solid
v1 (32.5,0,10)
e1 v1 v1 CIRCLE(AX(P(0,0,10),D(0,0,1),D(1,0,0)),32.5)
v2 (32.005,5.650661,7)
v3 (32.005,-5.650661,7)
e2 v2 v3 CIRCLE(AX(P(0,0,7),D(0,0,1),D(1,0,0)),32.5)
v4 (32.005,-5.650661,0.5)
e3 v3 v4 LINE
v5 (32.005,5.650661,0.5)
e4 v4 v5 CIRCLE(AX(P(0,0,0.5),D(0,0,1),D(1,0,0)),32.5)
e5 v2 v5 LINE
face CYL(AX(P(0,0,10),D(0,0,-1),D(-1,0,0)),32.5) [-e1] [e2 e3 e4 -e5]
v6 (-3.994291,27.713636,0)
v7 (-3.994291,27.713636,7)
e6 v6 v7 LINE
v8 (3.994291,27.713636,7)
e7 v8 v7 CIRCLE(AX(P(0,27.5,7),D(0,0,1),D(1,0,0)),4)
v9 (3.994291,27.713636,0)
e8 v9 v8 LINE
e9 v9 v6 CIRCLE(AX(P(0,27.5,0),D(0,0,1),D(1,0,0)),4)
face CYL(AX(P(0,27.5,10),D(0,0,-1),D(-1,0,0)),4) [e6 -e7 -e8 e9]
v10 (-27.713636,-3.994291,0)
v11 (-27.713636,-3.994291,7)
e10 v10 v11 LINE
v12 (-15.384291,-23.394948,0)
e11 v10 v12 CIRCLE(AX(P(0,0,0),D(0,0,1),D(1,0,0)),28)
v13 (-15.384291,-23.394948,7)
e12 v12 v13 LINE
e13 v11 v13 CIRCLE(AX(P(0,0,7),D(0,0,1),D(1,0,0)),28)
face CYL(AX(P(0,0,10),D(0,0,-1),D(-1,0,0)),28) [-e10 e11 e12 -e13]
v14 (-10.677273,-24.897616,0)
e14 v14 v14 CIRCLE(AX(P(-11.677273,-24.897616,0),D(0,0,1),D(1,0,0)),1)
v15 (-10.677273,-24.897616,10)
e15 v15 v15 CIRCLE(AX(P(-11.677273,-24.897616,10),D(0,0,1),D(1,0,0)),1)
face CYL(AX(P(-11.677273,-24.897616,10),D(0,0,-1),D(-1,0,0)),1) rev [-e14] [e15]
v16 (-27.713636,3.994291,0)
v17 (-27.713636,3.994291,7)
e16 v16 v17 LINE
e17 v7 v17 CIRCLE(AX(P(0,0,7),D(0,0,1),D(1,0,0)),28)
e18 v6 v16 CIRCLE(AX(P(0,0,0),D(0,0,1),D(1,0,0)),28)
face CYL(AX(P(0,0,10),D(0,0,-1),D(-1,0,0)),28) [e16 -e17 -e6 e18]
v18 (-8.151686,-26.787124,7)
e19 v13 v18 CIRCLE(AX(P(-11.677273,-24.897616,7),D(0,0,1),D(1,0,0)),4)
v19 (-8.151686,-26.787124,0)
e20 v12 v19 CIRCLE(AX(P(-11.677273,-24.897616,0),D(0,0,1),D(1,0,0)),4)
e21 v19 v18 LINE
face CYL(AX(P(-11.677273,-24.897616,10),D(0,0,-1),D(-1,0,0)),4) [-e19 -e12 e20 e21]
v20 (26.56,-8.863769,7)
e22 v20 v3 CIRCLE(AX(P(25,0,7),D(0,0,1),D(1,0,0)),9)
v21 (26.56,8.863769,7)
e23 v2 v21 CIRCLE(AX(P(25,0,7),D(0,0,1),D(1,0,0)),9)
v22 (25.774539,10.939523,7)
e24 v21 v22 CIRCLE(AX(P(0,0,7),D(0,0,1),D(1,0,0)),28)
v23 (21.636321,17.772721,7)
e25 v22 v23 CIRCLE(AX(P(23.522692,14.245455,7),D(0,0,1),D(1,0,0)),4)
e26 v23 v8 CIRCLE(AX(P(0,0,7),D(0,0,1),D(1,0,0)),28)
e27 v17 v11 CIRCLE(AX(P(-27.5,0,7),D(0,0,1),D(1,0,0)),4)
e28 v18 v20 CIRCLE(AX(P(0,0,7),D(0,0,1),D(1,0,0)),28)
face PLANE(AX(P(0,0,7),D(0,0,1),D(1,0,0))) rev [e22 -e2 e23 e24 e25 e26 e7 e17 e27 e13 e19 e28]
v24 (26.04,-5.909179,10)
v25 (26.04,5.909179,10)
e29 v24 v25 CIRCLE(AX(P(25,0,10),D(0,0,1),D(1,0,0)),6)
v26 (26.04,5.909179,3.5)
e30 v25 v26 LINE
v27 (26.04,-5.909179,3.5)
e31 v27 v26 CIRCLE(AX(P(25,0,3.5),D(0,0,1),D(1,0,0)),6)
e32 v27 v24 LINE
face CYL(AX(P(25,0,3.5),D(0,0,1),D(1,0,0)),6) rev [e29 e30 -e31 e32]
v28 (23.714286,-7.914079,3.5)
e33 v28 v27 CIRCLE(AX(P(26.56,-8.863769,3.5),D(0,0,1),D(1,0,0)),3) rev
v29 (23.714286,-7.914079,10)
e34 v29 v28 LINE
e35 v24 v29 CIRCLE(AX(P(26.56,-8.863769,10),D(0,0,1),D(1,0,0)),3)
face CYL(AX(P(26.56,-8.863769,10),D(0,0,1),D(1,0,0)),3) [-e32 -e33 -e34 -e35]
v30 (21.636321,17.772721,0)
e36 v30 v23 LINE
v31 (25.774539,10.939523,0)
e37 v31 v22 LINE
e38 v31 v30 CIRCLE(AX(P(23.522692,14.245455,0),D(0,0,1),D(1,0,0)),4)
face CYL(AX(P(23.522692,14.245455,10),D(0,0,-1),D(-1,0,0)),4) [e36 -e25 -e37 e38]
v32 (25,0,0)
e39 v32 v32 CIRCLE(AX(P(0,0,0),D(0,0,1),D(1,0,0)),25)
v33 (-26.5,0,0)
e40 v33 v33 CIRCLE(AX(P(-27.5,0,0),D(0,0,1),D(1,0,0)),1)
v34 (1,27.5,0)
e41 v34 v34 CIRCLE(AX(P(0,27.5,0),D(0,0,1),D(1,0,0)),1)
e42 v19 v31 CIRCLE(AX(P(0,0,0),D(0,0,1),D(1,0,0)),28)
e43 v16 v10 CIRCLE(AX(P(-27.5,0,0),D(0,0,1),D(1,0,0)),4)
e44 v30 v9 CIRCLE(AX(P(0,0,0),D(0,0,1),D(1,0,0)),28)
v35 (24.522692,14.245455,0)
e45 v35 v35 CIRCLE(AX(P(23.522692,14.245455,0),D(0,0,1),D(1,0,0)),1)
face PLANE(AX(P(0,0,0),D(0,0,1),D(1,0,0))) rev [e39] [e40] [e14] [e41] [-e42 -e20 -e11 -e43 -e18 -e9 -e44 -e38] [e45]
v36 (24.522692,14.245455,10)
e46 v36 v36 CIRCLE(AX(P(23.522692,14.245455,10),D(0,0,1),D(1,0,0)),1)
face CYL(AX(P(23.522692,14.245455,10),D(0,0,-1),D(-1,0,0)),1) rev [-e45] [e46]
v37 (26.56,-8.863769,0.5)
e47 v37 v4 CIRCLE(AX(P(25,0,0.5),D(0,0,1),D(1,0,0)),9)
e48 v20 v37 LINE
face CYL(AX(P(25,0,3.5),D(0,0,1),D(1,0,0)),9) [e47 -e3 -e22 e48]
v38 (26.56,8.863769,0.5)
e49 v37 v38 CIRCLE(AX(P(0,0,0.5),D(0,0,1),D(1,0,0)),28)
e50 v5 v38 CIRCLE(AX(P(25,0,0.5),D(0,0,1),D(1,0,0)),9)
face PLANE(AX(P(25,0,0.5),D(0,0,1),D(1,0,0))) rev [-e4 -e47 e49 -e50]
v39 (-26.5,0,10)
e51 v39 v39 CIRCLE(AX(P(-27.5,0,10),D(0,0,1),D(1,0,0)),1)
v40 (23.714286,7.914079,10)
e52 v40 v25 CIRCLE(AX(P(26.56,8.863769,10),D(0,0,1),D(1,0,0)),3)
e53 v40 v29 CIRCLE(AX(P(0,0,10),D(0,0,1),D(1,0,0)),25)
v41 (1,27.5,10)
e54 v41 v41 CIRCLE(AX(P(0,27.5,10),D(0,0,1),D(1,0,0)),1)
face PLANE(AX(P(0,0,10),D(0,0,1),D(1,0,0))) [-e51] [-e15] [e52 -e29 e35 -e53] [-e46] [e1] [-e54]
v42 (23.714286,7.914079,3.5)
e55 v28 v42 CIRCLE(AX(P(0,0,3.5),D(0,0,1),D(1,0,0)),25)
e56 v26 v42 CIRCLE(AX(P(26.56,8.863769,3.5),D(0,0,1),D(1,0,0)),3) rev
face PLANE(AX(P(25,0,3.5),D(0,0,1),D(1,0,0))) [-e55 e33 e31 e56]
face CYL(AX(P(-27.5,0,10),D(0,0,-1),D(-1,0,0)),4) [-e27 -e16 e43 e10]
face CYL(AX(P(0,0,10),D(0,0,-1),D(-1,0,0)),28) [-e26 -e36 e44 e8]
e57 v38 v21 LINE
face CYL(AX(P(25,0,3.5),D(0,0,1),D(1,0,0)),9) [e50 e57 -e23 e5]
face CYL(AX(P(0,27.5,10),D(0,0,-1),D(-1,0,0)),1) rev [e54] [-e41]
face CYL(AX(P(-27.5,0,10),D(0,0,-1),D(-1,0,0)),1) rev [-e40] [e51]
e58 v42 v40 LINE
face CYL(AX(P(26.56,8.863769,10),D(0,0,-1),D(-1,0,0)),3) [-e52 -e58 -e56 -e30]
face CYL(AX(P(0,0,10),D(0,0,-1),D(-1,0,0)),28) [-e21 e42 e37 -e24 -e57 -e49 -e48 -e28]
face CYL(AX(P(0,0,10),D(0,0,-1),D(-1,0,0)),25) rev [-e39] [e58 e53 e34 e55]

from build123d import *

# Parameters (mm, degrees)
SKETCH1_R                = 32.5
SKETCH1_R_2              = 25
SKETCH1_R_3              = 1
RING_BODY_DEPTH          = 10
SKETCH2_R                = 6
NUB_CUT_DEPTH            = 6.5
NUB_CUT_FILLETS_3MM_R    = 3
WEIGHT_REDUCTION_DEPTH   = 7
WEIGHT_REDUCTION_2_DEPTH = 0.5


# Read off the part's stored shape, not the designer's step: Weight reduction
with BuildPart() as part:
    # Sketch1 → Ring body (new body)
    with BuildSketch(Plane.XY):
        Circle(SKETCH1_R)
        Circle(SKETCH1_R_2, mode=Mode.SUBTRACT)
        with Locations((0, 27.5)):
            Circle(SKETCH1_R_3, mode=Mode.SUBTRACT)
        with Locations((23.5226917, 14.245454545)):
            Circle(SKETCH1_R_3, mode=Mode.SUBTRACT)
        with Locations((-27.5, 0)):
            Circle(SKETCH1_R_3, mode=Mode.SUBTRACT)
        with Locations((-11.677272727, -24.897616385)):
            Circle(SKETCH1_R_3, mode=Mode.SUBTRACT)
    extrude(amount=RING_BODY_DEPTH)

    # Sketch2 → Nub cut (cut)
    with BuildSketch(Plane.XY.offset(10)):
        with Locations((25, 0)):
            Circle(SKETCH2_R)
    extrude(amount=-NUB_CUT_DEPTH, mode=Mode.SUBTRACT)

    # Nub cut fillets 3mm
    nub_cut_fillets_3mm_edges = [part.edges().sort_by_distance(p)[0] for p in [
        (24.28, 5.95664335, 6.75),
        (24.28, -5.95664335, 6.75),
    ]]
    fillet(nub_cut_fillets_3mm_edges, radius=NUB_CUT_FILLETS_3MM_R)

    # Weight reduction outline → Weight reduction (cut)
    with BuildSketch(Plane.XY):
        with BuildLine():
            ThreePointArc((32.005, -5.650661466), (29.573928418, -7.751075978), (26.56, -8.86376895))
            ThreePointArc((26.56, -8.86376895), (12.846329016, -24.879144495), (-8.151686125, -26.787124021))
            ThreePointArc((-8.151686125, -26.787124021), (-13.375785124, -28.519087859), (-15.384291336, -23.394947747))
            ThreePointArc((-15.384291336, -23.394947747), (-23.631635891, -15.018181818), (-27.713636364, -3.994290864))
            ThreePointArc((-27.713636364, -3.994290864), (-31.5, 0), (-27.713636364, 3.994290864))
            ThreePointArc((-27.713636364, 3.994290864), (-19.798989873, 19.798989873), (-3.994290864, 27.713636364))
            ThreePointArc((-3.994290864, 27.713636364), (0, 31.5), (3.994290864, 27.713636364))
            ThreePointArc((3.994290864, 27.713636364), (13.745454545, 24.393902503), (21.636321277, 17.772720715))
            ThreePointArc((21.636321277, 17.772720715), (26.944174129, 16.317520661), (25.774538654, 10.939522711))
            ThreePointArc((25.774538654, 10.939522711), (26.187843982, 9.909431242), (26.56, 8.86376895))
            ThreePointArc((26.56, 8.86376895), (29.573928418, 7.751075978), (32.005, 5.650661466))
            ThreePointArc((32.005, 5.650661466), (-32.5, 0), (32.005, -5.650661466))
        make_face()
    extrude(amount=WEIGHT_REDUCTION_DEPTH, mode=Mode.SUBTRACT)

    # Weight reduction 2 outline → Weight reduction 2 (cut)
    with BuildSketch(Plane.XY):
        with BuildLine():
            ThreePointArc((26.56, 8.86376895), (28, 0), (26.56, -8.86376895))
            ThreePointArc((26.56, -8.86376895), (29.573928418, -7.751075978), (32.005, -5.650661466))
            ThreePointArc((32.005, -5.650661466), (32.5, 0), (32.005, 5.650661466))
            ThreePointArc((32.005, 5.650661466), (29.573928418, 7.751075978), (26.56, 8.86376895))
        make_face()
    extrude(amount=WEIGHT_REDUCTION_2_DEPTH, mode=Mode.SUBTRACT)


solid = part.part
